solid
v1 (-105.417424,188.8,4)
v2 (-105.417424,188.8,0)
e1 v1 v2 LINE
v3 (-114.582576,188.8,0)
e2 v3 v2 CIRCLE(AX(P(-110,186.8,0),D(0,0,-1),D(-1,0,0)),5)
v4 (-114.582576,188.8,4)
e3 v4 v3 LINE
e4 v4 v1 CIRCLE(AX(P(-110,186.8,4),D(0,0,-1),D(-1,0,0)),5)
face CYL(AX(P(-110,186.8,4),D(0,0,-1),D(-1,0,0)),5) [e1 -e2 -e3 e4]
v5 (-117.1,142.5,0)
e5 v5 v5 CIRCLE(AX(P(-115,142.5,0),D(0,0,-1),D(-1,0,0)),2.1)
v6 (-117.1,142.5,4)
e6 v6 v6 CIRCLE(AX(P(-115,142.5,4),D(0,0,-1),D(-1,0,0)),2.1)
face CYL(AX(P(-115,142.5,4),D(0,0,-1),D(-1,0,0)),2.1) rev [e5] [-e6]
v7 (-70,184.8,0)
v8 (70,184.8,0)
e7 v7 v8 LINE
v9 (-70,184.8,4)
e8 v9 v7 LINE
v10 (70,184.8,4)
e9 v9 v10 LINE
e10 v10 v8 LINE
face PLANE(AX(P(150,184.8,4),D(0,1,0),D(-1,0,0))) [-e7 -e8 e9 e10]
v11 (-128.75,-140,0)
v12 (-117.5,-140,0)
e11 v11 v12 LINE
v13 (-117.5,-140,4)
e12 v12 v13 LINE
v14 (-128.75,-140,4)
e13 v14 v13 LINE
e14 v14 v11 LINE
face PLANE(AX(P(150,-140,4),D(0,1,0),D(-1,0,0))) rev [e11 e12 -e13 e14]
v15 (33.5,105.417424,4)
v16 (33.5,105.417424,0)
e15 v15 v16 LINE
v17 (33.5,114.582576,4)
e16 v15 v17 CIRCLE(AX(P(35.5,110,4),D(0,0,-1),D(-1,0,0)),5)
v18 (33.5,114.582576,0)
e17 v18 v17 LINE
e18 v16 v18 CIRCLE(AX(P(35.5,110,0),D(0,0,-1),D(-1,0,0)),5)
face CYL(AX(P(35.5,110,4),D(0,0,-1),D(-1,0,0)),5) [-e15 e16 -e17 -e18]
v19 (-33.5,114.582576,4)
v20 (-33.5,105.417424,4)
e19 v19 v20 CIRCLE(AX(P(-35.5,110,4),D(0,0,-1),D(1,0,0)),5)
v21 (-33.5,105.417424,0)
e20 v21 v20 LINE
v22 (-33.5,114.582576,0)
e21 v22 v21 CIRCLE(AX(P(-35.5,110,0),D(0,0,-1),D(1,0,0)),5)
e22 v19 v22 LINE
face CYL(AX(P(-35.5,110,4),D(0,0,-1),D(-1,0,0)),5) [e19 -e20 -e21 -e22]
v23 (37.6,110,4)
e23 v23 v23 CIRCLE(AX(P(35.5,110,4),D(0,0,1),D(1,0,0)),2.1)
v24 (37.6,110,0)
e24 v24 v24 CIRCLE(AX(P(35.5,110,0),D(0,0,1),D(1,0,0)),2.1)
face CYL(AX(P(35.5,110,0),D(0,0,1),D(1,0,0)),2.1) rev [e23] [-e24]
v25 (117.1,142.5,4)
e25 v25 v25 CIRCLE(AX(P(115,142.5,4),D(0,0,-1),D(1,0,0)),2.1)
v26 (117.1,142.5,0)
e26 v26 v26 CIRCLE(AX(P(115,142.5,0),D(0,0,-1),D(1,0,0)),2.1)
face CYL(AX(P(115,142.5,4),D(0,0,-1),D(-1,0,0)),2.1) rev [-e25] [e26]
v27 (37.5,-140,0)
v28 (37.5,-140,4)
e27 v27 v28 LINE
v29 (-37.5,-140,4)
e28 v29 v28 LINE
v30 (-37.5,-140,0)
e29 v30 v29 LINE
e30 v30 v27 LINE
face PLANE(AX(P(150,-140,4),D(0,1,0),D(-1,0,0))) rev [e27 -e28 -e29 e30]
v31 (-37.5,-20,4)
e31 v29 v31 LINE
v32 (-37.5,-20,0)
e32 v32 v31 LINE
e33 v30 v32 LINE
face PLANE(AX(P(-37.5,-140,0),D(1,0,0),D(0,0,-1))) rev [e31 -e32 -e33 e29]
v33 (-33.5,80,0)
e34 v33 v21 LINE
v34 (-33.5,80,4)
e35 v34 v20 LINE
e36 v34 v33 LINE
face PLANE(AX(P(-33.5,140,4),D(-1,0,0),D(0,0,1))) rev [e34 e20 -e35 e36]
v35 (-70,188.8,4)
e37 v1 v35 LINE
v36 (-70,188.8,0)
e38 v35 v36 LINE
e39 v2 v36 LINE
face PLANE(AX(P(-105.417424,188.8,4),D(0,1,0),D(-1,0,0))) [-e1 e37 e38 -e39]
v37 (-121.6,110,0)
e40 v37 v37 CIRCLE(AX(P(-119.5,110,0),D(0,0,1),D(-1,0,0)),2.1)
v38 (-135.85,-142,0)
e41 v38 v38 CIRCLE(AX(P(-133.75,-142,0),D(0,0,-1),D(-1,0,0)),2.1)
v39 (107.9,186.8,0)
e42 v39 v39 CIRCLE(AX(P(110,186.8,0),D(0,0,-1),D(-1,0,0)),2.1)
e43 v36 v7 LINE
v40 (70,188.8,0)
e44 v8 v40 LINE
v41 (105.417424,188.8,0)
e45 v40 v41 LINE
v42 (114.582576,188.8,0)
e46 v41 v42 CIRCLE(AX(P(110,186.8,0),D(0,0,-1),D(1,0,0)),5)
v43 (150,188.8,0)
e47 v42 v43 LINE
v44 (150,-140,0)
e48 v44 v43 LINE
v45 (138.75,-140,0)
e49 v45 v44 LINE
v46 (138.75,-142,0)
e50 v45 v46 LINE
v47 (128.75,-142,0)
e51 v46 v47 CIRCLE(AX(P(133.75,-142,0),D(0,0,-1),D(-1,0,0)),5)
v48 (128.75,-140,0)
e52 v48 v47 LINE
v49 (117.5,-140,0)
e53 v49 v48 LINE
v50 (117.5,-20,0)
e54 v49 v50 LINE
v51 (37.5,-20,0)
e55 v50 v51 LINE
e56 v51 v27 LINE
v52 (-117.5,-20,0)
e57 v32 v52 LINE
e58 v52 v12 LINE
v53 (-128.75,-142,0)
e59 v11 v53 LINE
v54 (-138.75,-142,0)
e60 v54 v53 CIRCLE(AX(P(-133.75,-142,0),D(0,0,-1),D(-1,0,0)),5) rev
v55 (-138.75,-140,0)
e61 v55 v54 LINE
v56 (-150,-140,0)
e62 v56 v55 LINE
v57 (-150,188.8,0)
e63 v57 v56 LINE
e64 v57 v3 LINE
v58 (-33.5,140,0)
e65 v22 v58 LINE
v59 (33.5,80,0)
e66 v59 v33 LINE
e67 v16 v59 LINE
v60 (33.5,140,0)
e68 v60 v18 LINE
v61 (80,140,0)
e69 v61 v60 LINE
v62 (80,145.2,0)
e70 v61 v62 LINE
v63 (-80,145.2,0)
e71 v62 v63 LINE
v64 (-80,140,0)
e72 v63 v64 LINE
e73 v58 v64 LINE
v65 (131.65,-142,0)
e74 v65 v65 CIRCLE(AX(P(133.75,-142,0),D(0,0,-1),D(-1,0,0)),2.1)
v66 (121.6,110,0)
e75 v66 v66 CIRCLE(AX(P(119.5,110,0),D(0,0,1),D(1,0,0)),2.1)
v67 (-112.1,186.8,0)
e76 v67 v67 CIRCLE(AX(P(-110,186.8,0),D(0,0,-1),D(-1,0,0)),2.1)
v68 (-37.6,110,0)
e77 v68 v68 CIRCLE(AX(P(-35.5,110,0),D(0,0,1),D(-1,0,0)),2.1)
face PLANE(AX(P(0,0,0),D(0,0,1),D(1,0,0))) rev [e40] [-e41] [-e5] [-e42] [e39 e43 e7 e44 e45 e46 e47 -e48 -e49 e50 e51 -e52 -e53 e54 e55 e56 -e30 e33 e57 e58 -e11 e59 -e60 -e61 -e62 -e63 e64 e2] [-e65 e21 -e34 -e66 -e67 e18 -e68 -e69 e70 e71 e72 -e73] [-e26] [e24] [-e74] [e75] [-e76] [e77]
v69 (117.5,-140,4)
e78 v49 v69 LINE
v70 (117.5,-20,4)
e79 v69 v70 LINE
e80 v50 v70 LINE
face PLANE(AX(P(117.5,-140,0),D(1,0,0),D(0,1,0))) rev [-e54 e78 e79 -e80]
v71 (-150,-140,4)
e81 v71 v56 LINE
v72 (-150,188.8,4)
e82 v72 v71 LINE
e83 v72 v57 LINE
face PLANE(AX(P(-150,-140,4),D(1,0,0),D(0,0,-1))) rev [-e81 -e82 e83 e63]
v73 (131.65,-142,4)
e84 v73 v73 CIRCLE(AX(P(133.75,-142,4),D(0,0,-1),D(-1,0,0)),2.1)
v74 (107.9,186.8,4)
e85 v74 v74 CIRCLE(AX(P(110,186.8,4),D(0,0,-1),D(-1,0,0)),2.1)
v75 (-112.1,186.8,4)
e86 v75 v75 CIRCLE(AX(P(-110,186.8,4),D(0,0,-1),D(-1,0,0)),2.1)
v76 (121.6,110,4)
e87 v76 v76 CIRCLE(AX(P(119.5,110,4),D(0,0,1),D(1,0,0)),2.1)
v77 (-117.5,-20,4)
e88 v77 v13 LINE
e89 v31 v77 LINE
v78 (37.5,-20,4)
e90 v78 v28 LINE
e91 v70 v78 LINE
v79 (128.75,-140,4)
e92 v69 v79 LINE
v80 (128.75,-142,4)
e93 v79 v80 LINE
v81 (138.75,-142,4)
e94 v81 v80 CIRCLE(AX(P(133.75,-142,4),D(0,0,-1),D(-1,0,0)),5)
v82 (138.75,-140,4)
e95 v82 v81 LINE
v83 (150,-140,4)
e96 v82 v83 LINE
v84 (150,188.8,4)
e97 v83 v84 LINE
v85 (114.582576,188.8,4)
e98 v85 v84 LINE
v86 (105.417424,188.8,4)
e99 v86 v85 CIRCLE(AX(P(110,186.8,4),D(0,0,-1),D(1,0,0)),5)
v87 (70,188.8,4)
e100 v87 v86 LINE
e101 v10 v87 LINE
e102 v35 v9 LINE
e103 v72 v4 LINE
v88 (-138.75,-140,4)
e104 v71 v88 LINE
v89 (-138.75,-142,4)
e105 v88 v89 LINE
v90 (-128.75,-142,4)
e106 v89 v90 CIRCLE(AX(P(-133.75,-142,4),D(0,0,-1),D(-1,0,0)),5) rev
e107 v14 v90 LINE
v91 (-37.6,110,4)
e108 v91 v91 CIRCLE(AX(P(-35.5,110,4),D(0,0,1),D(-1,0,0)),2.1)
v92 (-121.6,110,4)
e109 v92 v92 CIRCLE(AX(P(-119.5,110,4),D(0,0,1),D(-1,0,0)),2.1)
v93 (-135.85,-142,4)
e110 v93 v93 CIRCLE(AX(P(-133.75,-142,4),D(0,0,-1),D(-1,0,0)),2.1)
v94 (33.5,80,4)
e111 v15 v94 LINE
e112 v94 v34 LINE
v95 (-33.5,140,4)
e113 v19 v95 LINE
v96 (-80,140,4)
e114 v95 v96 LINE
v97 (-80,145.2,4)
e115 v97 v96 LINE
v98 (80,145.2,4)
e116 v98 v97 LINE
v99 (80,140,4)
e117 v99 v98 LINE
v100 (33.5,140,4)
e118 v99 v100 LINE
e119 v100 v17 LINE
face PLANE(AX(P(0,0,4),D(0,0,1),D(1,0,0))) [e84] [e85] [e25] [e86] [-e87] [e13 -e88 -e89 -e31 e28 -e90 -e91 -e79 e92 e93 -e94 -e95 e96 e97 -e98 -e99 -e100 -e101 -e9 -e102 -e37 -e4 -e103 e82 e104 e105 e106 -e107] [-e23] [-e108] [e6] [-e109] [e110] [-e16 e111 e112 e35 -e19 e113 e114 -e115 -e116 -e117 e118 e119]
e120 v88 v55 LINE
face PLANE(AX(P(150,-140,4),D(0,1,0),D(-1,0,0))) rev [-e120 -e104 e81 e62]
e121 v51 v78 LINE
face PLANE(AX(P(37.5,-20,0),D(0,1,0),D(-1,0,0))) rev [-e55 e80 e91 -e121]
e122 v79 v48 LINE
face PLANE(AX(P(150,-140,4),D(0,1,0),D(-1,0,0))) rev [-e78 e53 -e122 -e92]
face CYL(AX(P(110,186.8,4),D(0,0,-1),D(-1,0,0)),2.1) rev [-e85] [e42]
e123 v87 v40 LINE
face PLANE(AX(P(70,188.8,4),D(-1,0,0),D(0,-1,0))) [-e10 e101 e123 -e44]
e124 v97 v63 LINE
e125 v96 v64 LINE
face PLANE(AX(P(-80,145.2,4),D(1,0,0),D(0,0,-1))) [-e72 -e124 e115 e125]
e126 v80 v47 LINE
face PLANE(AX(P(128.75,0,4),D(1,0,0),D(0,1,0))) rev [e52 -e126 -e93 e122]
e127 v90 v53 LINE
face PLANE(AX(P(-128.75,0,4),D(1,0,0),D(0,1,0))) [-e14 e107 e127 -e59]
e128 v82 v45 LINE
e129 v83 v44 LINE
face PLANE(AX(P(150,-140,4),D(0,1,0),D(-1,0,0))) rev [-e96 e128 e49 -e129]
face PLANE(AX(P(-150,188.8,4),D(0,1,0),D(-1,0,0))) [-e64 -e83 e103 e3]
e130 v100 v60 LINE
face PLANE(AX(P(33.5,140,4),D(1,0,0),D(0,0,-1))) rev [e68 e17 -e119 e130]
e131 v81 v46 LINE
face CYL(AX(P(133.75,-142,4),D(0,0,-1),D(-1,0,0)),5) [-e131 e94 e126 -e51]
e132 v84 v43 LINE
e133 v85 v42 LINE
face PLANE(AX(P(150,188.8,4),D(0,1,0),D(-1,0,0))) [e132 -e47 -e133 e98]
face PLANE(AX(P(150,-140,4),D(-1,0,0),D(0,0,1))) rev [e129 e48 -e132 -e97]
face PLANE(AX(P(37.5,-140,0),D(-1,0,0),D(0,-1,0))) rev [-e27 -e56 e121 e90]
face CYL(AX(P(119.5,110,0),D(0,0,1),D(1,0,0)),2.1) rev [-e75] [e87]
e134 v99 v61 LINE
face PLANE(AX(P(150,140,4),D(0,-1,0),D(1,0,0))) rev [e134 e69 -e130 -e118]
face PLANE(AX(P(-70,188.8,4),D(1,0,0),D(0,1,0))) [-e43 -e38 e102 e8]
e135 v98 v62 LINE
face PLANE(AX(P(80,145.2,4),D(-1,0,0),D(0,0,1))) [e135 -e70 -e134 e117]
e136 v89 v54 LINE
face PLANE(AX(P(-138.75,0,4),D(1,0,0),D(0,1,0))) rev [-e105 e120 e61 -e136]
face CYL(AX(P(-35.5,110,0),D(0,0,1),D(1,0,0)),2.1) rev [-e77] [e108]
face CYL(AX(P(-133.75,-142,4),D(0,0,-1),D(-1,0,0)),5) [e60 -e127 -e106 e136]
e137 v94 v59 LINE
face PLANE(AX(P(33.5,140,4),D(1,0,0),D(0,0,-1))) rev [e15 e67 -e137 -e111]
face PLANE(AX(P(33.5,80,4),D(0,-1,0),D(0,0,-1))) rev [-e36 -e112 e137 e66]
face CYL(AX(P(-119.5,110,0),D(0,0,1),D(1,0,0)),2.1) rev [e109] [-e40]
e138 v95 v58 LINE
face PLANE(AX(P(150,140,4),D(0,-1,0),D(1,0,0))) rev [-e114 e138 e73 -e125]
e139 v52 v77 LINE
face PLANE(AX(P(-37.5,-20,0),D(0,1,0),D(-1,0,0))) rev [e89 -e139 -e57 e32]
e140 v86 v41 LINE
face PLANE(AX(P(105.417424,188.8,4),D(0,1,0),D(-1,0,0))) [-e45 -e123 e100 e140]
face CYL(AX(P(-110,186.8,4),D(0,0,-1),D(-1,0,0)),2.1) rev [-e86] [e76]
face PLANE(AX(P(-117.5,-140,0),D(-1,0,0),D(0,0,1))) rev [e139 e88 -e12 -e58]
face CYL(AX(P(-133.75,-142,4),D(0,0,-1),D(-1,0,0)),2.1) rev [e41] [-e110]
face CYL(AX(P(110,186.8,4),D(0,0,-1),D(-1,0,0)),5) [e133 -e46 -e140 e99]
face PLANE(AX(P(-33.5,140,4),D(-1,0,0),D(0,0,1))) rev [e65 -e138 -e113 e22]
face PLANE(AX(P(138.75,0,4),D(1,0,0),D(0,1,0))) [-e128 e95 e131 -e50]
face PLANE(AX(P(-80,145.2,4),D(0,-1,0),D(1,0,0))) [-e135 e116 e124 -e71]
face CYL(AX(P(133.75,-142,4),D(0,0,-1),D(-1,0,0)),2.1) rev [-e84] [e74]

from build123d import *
from build123d.topology import SkipClean

# Parameters (mm, degrees)
ESQUISSE1_W             = 300
ESQUISSE1_H             = 280
BOSS_EXTRU_1_DEPTH      = 4
ESQUISSE2_W             = 80
ESQUISSE2_H             = 120
ENL_V_MAT_EXTRU_1_DEPTH = 206.221831197
ESQUISSE4_W             = 67
ESQUISSE4_H             = 60
ENL_V_MAT_EXTRU_3_DEPTH = 206.221831197
BOSS_EXTRU_2_DEPTH      = 4
ESQUISSE6_R             = 2.1
ENL_V_MAT_EXTRU_4_DEPTH = 211.059515376
BOSS_EXTRU_3_DEPTH      = 4
BOSS_EXTRU_4_DEPTH      = 4
ESQUISSE9_R             = 2.1
ENL_V_MAT_EXTRU_5_DEPTH = 244.522565689
ESQUISSE10_R            = 2.1
ENL_V_MAT_EXTRU_6_DEPTH = 244.522565689
ESQUISSE11_R            = 2.1
ENL_V_MAT_EXTRU_7_DEPTH = 244.522565689
BOSS_EXTRU_5_START      = -4
ESQUISSE12_R            = 5
ESQUISSE12_R_2          = 2.1
BOSS_EXTRU_5_DEPTH      = 4


with BuildPart() as part:
    # Esquisse1 → Boss.-Extru.1 (new body)
    with BuildSketch(Plane.XY):
        Rectangle(ESQUISSE1_W, ESQUISSE1_H)
    extrude(amount=BOSS_EXTRU_1_DEPTH)

    # Esquisse2 → Enlèv. mat.-Extru.1 (cut, through all)
    with BuildSketch(Plane.XY.offset(4)):
        with Locations((77.5, -80)):
            Rectangle(ESQUISSE2_W, ESQUISSE2_H)
        with Locations((-77.5, -80)):
            Rectangle(ESQUISSE2_W, ESQUISSE2_H)
    extrude(amount=-ENL_V_MAT_EXTRU_1_DEPTH, mode=Mode.SUBTRACT)

    # Esquisse4 → Enlèv. mat.-Extru.3 (cut, through all)
    with BuildSketch(Plane(origin=(0, 0, 0), x_dir=(-1, 0, 0), z_dir=(0, 0, -1))):
        with Locations((0, 110)):
            Rectangle(ESQUISSE4_W, ESQUISSE4_H)
    extrude(amount=-ENL_V_MAT_EXTRU_3_DEPTH, mode=Mode.SUBTRACT)

    # Esquisse5 → Boss.-Extru.2 (add)
    with BuildSketch(Plane(origin=(0, 0, 0), x_dir=(-1, 0, 0), z_dir=(0, 0, -1))):
        with BuildLine():
            Line((-128.75, -142), (-128.75, -140))
            Line((-128.75, -140), (-138.75, -140))
            Line((-138.75, -140), (-138.75, -142))
            ThreePointArc((-138.75, -142), (-133.75, -147), (-128.75, -142))
        make_face()
        with BuildLine():
            Line((138.75, -140), (128.75, -140))
            Line((128.75, -140), (128.75, -142))
            ThreePointArc((128.75, -142), (133.75, -147), (138.75, -142))
            Line((138.75, -142), (138.75, -140))
        make_face()
    extrude(amount=-BOSS_EXTRU_2_DEPTH)

    # Esquisse6 → Enlèv. mat.-Extru.4 (cut, through all)
    with BuildSketch(Plane(origin=(0, 0, 0), x_dir=(-1, 0, 0), z_dir=(0, 0, -1))):
        with Locations((-133.75, -142)):
            Circle(ESQUISSE6_R)
        with Locations((133.75, -142)):
            Circle(ESQUISSE6_R)
    extrude(amount=-ENL_V_MAT_EXTRU_4_DEPTH, mode=Mode.SUBTRACT)

    # Esquisse7 → Boss.-Extru.3 (add)
    with BuildSketch(Plane(origin=(0, 0, 0), x_dir=(-1, 0, 0), z_dir=(0, 0, -1))):
        Polygon((-150, 140), (-150, 184.8), (150, 184.8), (150, 140), (80, 140), (80, 145.2), (-80, 145.2), (-80, 140), align=None)
    extrude(amount=-BOSS_EXTRU_3_DEPTH)

    # Esquisse8 → Boss.-Extru.4 (add)
    with BuildSketch(Plane(origin=(0, 0, 0), x_dir=(-1, 0, 0), z_dir=(0, 0, -1))):
        with BuildLine():
            Line((-150, 184.8), (-150, 188.8))
            Line((-150, 188.8), (-114.582575695, 188.8))
            ThreePointArc((-114.582575695, 188.8), (-110, 191.8), (-105.417424305, 188.8))
            Line((-105.417424305, 188.8), (-70, 188.8))
            Line((-70, 188.8), (-70, 184.8))
            Line((-70, 184.8), (-150, 184.8))
        make_face()
        with BuildLine():
            Line((105.417424305, 188.8), (70, 188.8))
            Line((70, 188.8), (70, 184.8))
            Line((70, 184.8), (150, 184.8))
            Line((150, 184.8), (150, 188.8))
            Line((150, 188.8), (114.582575695, 188.8))
            ThreePointArc((114.582575695, 188.8), (110, 191.8), (105.417424305, 188.8))
        make_face()
    extrude(amount=-BOSS_EXTRU_4_DEPTH)

    # Esquisse9 → Enlèv. mat.-Extru.5 (cut, through all)
    with BuildSketch(Plane(origin=(0, 0, 0), x_dir=(-1, 0, 0), z_dir=(0, 0, -1))):
        with Locations((-110, 186.8)):
            Circle(ESQUISSE9_R)
        with Locations((110, 186.8)):
            Circle(ESQUISSE9_R)
    extrude(amount=-ENL_V_MAT_EXTRU_5_DEPTH, mode=Mode.SUBTRACT)

    # Esquisse10 → Enlèv. mat.-Extru.6 (cut, through all)
    with BuildSketch(Plane(origin=(0, 0, 0), x_dir=(-1, 0, 0), z_dir=(0, 0, -1))):
        with Locations((115, 142.5)):
            Circle(ESQUISSE10_R)
        with Locations((-115, 142.5)):
            Circle(ESQUISSE10_R)
    extrude(amount=-ENL_V_MAT_EXTRU_6_DEPTH, mode=Mode.SUBTRACT)

    # Esquisse11 → Enlèv. mat.-Extru.7 (cut, through all)
    with BuildSketch(Plane.XY.offset(4)):
        with Locations((35.5, 110)):
            Circle(ESQUISSE11_R)
        with Locations((119.5, 110)):
            Circle(ESQUISSE11_R)
        with Locations((-119.5, 110)):
            Circle(ESQUISSE11_R)
        with Locations((-35.5, 110)):
            Circle(ESQUISSE11_R)
    extrude(amount=-ENL_V_MAT_EXTRU_7_DEPTH, mode=Mode.SUBTRACT)

    # Esquisse12 → Boss.-Extru.5 (add)
    # profile 1 of 2: a face of its own
    with SkipClean():  # the faces are left unmerged after this step: merging them gives an invalid solid
        with BuildSketch(Plane(origin=(0, 0, 0), x_dir=(-1, 0, 0), z_dir=(0, 0, -1)).offset(BOSS_EXTRU_5_START)):
            with Locations((-35.5, 110)):
                Circle(ESQUISSE12_R)
            with Locations((-35.5, 110)):
                Circle(ESQUISSE12_R_2, mode=Mode.SUBTRACT)
        # profile 2 of 2: a face of its own
        with BuildSketch(Plane(origin=(0, 0, 0), x_dir=(-1, 0, 0), z_dir=(0, 0, -1)).offset(BOSS_EXTRU_5_START)):
            with Locations((35.5, 110)):
                Circle(ESQUISSE12_R)
            with Locations((35.5, 110)):
                Circle(ESQUISSE12_R_2, mode=Mode.SUBTRACT)
        extrude(amount=BOSS_EXTRU_5_DEPTH)
    add(part.part.scale(1), mode=Mode.REPLACE)  # the faces are merged on a copy


solid = part.part
